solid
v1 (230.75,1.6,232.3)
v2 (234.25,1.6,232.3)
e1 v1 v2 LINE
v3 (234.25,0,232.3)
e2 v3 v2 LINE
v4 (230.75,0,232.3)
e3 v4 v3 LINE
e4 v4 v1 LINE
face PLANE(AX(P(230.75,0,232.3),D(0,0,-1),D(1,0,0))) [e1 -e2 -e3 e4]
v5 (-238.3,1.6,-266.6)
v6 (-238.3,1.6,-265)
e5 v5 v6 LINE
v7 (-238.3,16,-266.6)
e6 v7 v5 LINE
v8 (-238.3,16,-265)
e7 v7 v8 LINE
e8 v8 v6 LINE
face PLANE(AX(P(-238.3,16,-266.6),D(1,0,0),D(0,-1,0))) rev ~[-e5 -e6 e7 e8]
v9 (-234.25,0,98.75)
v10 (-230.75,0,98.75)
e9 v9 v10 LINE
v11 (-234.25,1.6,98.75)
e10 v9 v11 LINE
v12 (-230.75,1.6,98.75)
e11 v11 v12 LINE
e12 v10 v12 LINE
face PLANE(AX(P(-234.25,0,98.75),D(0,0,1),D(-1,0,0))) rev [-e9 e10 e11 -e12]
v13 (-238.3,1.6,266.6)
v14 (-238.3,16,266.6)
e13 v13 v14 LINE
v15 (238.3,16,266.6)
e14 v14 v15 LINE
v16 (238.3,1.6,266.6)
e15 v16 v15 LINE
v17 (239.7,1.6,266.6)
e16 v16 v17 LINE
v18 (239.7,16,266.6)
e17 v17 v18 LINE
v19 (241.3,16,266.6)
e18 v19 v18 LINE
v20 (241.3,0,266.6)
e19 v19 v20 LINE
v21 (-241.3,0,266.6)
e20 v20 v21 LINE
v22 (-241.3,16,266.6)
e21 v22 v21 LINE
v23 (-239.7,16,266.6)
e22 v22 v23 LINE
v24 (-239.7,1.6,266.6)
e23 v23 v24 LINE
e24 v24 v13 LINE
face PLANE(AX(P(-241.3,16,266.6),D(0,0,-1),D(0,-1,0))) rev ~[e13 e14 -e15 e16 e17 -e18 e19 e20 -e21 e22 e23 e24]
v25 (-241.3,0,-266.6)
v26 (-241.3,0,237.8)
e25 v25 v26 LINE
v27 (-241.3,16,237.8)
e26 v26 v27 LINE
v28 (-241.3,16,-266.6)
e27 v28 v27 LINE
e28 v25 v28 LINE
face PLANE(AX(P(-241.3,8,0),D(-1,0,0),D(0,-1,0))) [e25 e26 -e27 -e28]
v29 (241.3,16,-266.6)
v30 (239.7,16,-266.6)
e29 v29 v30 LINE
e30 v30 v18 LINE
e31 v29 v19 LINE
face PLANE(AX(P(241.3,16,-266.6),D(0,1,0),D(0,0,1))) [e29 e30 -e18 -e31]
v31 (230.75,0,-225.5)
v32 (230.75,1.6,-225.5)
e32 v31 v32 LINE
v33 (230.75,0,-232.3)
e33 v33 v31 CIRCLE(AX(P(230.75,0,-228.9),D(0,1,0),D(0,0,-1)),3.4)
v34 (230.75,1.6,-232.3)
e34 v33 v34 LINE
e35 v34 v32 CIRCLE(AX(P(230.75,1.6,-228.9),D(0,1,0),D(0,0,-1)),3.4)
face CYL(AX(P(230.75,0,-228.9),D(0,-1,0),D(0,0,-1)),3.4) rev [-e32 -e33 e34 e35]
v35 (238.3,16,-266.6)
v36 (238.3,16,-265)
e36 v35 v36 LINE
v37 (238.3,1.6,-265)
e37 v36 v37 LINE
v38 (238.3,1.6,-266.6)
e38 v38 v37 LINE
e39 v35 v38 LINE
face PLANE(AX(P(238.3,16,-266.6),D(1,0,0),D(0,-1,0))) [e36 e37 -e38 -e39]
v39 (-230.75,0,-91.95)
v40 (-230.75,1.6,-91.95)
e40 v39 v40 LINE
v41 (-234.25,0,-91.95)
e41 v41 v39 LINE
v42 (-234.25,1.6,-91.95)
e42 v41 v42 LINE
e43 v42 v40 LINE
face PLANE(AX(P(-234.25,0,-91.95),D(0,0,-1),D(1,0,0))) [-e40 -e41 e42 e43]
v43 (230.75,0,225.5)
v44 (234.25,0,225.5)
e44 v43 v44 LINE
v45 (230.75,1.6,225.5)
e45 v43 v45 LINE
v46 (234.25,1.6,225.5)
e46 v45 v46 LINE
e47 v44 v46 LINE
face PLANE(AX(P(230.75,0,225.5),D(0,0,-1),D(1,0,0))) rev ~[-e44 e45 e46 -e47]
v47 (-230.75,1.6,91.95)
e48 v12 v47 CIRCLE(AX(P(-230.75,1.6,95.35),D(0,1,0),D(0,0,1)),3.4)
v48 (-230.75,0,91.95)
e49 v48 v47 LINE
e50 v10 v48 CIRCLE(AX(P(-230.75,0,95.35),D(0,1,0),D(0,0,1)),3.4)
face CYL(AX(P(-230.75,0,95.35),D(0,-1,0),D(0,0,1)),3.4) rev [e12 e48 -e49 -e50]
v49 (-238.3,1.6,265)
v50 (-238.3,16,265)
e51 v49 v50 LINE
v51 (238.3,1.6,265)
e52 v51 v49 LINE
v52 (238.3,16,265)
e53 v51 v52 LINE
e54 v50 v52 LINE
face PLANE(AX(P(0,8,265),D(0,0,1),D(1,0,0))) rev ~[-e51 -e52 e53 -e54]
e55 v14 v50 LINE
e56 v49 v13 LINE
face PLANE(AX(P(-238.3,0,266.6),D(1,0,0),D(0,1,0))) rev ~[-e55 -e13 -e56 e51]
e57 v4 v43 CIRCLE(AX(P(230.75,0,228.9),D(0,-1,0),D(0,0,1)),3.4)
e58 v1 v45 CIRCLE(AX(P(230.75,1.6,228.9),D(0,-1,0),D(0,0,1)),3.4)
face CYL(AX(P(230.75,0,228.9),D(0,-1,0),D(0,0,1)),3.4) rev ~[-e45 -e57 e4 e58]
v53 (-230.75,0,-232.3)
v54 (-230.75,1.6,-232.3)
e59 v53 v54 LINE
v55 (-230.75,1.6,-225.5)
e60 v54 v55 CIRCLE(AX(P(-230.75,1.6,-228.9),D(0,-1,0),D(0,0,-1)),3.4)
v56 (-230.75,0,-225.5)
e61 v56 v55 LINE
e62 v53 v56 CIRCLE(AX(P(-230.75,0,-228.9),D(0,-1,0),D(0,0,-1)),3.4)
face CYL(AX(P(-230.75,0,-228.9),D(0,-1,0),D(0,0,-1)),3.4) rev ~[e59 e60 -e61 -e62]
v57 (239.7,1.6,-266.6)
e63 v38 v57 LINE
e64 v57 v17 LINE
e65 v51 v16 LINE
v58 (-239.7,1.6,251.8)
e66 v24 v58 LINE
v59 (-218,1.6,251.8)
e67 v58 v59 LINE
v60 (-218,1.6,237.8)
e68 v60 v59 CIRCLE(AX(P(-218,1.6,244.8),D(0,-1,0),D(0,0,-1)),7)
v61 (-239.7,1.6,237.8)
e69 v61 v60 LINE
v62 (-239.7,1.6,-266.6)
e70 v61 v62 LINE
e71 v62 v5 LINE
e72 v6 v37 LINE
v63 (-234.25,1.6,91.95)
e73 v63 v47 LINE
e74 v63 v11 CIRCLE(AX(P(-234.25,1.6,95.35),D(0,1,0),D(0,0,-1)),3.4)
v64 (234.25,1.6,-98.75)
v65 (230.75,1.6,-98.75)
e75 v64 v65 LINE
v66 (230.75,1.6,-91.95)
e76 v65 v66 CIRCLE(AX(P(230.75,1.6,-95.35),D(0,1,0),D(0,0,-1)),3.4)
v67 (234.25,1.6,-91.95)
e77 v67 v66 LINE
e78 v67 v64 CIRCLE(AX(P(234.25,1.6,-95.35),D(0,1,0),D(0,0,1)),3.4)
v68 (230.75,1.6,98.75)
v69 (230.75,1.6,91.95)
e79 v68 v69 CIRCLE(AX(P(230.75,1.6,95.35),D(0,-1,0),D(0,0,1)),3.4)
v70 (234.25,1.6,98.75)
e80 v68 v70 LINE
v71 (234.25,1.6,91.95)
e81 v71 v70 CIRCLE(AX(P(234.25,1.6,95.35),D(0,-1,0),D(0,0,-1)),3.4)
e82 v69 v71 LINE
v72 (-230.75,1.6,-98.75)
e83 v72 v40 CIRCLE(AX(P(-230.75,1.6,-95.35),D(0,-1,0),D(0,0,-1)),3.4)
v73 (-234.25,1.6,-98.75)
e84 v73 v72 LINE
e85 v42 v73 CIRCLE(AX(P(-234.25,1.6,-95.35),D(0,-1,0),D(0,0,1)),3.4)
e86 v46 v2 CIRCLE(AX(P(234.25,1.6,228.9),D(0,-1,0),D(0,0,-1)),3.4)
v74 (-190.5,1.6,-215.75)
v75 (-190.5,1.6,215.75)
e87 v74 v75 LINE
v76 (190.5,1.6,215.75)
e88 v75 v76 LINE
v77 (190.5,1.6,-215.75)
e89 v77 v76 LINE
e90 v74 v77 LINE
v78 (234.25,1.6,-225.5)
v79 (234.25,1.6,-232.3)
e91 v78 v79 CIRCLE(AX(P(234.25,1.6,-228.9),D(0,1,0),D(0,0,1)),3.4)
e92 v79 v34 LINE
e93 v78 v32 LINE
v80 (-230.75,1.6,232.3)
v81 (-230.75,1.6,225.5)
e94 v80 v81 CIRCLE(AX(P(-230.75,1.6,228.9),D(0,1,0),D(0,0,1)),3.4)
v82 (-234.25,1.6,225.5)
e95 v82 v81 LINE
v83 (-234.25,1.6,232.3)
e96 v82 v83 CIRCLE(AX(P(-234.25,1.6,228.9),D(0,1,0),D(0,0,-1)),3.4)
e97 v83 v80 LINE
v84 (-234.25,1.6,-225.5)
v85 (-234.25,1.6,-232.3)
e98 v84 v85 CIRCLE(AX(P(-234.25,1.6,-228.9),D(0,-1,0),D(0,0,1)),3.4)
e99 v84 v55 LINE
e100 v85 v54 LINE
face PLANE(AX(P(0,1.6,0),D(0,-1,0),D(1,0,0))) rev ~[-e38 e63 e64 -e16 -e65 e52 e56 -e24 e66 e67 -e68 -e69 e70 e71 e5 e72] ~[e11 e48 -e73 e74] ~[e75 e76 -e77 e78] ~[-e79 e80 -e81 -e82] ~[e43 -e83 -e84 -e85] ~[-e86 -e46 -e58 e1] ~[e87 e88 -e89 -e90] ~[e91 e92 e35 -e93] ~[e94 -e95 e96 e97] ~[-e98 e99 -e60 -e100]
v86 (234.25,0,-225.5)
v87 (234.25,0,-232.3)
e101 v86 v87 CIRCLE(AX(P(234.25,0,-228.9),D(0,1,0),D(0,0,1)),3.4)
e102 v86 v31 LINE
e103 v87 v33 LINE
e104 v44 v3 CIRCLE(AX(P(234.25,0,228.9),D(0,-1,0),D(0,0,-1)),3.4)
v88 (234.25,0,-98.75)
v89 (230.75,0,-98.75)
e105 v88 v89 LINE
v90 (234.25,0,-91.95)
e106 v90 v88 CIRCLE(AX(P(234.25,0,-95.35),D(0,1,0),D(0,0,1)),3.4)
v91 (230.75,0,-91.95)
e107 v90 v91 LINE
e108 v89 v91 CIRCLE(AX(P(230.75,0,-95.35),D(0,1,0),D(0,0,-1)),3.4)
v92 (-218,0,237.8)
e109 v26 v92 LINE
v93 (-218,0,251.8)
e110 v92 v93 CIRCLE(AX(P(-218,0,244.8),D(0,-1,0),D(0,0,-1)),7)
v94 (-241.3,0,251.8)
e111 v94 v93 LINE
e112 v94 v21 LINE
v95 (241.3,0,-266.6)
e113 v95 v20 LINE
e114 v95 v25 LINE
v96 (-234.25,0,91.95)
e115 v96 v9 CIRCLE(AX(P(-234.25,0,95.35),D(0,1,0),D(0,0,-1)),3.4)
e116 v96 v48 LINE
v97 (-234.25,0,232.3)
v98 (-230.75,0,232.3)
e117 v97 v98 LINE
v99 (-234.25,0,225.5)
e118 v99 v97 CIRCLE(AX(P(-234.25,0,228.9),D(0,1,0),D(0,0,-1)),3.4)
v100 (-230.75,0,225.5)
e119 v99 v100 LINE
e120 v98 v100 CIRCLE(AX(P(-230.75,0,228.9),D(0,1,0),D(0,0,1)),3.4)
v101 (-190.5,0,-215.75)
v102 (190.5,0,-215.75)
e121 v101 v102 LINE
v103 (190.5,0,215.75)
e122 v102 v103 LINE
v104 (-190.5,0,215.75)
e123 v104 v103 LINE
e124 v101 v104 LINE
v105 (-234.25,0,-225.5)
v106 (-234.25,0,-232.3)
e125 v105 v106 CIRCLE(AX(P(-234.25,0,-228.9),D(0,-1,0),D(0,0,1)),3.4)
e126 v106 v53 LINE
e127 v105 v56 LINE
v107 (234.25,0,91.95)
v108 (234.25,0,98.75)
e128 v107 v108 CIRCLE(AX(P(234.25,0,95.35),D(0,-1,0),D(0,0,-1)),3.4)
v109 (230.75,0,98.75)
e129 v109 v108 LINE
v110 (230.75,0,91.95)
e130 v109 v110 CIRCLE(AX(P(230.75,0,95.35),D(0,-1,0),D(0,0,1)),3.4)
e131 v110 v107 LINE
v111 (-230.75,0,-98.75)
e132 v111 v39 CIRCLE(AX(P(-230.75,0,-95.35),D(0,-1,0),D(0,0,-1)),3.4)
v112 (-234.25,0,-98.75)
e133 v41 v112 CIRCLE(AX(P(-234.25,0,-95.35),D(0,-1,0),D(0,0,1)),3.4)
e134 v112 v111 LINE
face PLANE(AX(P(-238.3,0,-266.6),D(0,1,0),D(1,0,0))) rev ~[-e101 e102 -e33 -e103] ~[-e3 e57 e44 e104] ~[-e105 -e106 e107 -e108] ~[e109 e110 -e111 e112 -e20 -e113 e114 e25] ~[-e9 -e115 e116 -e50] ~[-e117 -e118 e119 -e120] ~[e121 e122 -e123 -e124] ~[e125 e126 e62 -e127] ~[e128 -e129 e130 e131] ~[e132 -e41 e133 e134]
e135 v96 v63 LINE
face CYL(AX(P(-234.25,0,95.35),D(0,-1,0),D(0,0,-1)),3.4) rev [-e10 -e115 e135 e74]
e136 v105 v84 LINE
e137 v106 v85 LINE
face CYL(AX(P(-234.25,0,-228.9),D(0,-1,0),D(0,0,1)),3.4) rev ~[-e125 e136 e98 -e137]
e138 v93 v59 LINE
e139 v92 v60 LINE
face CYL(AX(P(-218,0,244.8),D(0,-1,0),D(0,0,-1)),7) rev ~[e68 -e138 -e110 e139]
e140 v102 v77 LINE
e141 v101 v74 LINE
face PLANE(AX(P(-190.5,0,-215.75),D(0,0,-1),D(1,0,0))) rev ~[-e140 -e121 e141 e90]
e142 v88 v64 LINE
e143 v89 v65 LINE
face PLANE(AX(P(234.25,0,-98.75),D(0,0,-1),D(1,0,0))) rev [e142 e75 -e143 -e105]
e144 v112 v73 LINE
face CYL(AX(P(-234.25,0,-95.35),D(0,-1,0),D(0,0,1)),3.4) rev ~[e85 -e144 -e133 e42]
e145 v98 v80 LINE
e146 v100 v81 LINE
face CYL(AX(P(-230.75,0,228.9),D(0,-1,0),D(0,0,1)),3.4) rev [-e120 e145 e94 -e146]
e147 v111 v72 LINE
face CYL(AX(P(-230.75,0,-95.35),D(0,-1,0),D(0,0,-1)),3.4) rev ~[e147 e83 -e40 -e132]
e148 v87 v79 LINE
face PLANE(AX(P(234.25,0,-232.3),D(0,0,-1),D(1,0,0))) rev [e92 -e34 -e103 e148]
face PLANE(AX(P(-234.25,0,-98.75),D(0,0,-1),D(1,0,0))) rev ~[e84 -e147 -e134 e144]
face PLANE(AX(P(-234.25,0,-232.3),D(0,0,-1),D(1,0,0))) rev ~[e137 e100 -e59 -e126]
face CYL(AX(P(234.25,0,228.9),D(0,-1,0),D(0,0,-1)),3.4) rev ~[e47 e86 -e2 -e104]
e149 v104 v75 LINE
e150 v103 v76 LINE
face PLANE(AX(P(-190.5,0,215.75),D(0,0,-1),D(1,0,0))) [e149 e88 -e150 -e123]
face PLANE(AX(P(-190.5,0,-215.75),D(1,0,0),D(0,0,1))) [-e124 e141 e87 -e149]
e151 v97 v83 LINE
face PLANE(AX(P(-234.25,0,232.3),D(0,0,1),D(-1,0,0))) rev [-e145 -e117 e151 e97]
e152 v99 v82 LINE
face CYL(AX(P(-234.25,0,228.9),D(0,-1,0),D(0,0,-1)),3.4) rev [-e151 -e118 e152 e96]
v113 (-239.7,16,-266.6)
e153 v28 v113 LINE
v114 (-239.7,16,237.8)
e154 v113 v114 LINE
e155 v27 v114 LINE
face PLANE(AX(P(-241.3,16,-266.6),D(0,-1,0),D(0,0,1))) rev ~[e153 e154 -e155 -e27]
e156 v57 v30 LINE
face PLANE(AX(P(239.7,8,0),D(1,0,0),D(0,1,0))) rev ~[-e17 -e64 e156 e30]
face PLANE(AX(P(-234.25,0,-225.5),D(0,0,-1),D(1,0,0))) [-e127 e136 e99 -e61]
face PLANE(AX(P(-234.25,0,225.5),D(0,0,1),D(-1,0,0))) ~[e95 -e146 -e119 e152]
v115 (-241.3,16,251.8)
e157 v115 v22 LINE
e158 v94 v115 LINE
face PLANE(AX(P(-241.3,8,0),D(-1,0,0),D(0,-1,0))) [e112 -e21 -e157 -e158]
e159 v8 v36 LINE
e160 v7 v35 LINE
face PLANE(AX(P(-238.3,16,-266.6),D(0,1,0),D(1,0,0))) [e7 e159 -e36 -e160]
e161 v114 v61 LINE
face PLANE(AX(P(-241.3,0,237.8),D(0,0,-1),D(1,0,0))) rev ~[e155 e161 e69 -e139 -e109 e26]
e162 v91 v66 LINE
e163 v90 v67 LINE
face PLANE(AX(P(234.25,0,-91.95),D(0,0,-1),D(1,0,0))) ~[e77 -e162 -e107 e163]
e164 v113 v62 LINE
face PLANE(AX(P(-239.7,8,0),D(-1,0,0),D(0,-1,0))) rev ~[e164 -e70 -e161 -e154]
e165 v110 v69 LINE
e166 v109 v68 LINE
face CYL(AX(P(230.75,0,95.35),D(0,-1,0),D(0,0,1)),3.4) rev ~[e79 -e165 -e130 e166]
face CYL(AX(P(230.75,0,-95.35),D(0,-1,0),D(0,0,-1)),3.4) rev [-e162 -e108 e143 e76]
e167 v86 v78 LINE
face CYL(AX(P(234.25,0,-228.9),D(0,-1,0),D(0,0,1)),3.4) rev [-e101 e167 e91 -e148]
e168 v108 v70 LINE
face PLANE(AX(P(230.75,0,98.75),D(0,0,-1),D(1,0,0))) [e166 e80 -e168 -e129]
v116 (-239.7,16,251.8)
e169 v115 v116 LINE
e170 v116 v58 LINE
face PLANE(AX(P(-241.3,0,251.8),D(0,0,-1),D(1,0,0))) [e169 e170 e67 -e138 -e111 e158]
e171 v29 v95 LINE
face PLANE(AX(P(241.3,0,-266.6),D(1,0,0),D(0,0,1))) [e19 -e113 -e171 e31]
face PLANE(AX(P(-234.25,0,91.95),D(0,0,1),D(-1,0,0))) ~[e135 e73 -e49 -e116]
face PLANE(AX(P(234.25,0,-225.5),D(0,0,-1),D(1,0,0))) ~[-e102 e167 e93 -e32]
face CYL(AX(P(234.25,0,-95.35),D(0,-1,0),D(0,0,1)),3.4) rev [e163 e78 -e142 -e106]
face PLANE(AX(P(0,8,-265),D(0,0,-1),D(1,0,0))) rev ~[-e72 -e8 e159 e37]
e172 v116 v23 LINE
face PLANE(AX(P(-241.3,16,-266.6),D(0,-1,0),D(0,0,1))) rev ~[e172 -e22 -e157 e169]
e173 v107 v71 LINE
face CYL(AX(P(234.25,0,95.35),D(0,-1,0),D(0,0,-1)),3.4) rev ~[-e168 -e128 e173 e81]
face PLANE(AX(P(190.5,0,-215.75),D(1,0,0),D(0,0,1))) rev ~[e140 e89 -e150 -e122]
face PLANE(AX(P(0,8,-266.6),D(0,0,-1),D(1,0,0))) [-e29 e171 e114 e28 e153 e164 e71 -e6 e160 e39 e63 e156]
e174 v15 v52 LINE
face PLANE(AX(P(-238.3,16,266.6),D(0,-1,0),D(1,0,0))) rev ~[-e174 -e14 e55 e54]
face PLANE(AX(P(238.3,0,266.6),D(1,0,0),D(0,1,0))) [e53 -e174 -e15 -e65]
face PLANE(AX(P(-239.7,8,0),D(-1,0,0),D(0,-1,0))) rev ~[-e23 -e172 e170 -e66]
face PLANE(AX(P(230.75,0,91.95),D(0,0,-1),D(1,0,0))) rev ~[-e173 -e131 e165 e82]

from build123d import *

# Parameters (mm, degrees)
F0_W              = 482.6
F0_H              = 533.2
F1_DEPTH          = 1.6
F2_W              = 16
F2_H              = 533.2
F3_DEPTH          = 1.6
F4_W              = 16
F4_H              = 533.2
F5_DEPTH          = 1.6
F6_W              = 476.6
F6_H              = 16
F7_DEPTH          = 1.6
F8_W              = 476.6
F8_H              = 16
F9_DEPTH          = 1.6
F10_W             = 381
F10_H             = 431.5
F11_DEPTH         = 1.6
F12_W             = 3.5
F12_H             = 6.8
F13_DEPTH         = 1.6
F13_COPIES3_COUNT = 2
F13_COPIES3_PITCH = 652.537999
F13_COPIES4_COUNT = 2
F13_COPIES4_PITCH = 566.888933
F14_W             = 3.5
F14_H             = 6.8
F15_DEPTH         = 1.6
F16_W             = 23.3
F16_H             = 14
F17_DEPTH         = 16


# Not quite as in the source:
# - a pattern or mirror of a feature is missing from the dataset's text; its kind, count and spacing are read off the source's solid


with BuildPart() as f1:
    # F0 (on Front) → F1 (new body)
    with BuildSketch(Plane.XZ):
        Rectangle(F0_W, F0_H)
    extrude(amount=-F1_DEPTH)

    # F2 (on face) → F3 (join)
    with BuildSketch(Plane(origin=(-241.3, 0, 0), x_dir=(0, -1, 0), z_dir=(-1, 0, 0))):
        with Locations((-8, 0)):
            Rectangle(F2_W, F2_H)
    extrude(amount=-F3_DEPTH)

    # F4 (on face) → F5 (join)
    with BuildSketch(Plane.YZ.offset(241.3)):
        with Locations((8, 0)):
            Rectangle(F4_W, F4_H)
    extrude(amount=-F5_DEPTH)

    # F6 (on face) → F7 (join)
    with BuildSketch(Plane.XY.offset(266.6)):
        with Locations((0, 8)):
            Rectangle(F6_W, F6_H)
    extrude(amount=-F7_DEPTH)

    # F8 (on face) → F9 (join)
    with BuildSketch(Plane(origin=(0, 0, -266.6), x_dir=(1, 0, 0), z_dir=(0, 0, -1))):
        with Locations((0, -8)):
            Rectangle(F8_W, F8_H)
    extrude(amount=-F9_DEPTH)

    # F10 (on face) → F11 (cut)
    with BuildSketch(Plane.XZ):
        Rectangle(F10_W, F10_H)
    extrude(amount=-F11_DEPTH, mode=Mode.SUBTRACT)

    # F12 (on face) → F13 (cut)
    with BuildSketch(Plane.XZ):
        with Locations((-232.5, -228.9)):
            Rectangle(F12_W, F12_H)
        with BuildLine():
            Line((-230.75, -225.5), (-230.75, -232.3))
            ThreePointArc((-230.75, -232.3), (-227.35, -228.9), (-230.75, -225.5))
        make_face()
        with BuildLine():
            ThreePointArc((-234.25, -225.5), (-237.65, -228.9), (-234.25, -232.3))
            Line((-234.25, -232.3), (-234.25, -225.5))
        make_face()
    f13 = extrude(amount=-F13_DEPTH, mode=Mode.SUBTRACT)

    # F13_copies: F13 across plane
    add(f13.mirror(Plane.XY), mode=Mode.SUBTRACT)

    # F13_copies1: F13 across plane
    add(f13.mirror(Plane.XY.offset(-66.775)), mode=Mode.SUBTRACT)

    # F13_copies2: F13 across plane
    add(f13.mirror(Plane(origin=(0, 0, 0), x_dir=(0, 0, 1), z_dir=(1, 0, 0))), mode=Mode.SUBTRACT)

    # F13_copies3: F13 ×2
    with Locations(*[Vector(0.7126021792, 0, 0.701568339) * (i * F13_COPIES3_PITCH) for i in range(1, F13_COPIES3_COUNT)]):
        add(f13, mode=Mode.SUBTRACT)

    # F13_copies4: F13 ×2
    with Locations(*[Vector(0.8202664981, 0, 0.5719815312) * (i * F13_COPIES4_PITCH) for i in range(1, F13_COPIES4_COUNT)]):
        add(f13, mode=Mode.SUBTRACT)

    # F14 (on face) → F15 (cut)
    with BuildSketch(Plane.XZ):
        with Locations((-232.5, -95.35)):
            Rectangle(F14_W, F14_H)
        with BuildLine():
            Line((-230.75, -91.95), (-230.75, -98.75))
            ThreePointArc((-230.75, -98.75), (-227.35, -95.35), (-230.75, -91.95))
        make_face()
        with BuildLine():
            ThreePointArc((-234.25, -91.95), (-237.65, -95.35), (-234.25, -98.75))
            Line((-234.25, -98.75), (-234.25, -91.95))
        make_face()
    f15 = extrude(amount=-F15_DEPTH, mode=Mode.SUBTRACT)

    # F15_copies: F15 across plane
    add(f15.mirror(Plane(origin=(0, 0, 0), x_dir=(0, 0, 1), z_dir=(1, 0, 0))), mode=Mode.SUBTRACT)

    # F16 (on face) → F17 (cut)
    with BuildSketch(Plane.XZ):
        with Locations((-229.65, 244.8)):
            Rectangle(F16_W, F16_H)
        with BuildLine():
            Line((-218, 251.8), (-218, 237.8))
            ThreePointArc((-218, 237.8), (-211, 244.8), (-218, 251.8))
        make_face()
    extrude(amount=-F17_DEPTH, mode=Mode.SUBTRACT)


solid = f1.part
